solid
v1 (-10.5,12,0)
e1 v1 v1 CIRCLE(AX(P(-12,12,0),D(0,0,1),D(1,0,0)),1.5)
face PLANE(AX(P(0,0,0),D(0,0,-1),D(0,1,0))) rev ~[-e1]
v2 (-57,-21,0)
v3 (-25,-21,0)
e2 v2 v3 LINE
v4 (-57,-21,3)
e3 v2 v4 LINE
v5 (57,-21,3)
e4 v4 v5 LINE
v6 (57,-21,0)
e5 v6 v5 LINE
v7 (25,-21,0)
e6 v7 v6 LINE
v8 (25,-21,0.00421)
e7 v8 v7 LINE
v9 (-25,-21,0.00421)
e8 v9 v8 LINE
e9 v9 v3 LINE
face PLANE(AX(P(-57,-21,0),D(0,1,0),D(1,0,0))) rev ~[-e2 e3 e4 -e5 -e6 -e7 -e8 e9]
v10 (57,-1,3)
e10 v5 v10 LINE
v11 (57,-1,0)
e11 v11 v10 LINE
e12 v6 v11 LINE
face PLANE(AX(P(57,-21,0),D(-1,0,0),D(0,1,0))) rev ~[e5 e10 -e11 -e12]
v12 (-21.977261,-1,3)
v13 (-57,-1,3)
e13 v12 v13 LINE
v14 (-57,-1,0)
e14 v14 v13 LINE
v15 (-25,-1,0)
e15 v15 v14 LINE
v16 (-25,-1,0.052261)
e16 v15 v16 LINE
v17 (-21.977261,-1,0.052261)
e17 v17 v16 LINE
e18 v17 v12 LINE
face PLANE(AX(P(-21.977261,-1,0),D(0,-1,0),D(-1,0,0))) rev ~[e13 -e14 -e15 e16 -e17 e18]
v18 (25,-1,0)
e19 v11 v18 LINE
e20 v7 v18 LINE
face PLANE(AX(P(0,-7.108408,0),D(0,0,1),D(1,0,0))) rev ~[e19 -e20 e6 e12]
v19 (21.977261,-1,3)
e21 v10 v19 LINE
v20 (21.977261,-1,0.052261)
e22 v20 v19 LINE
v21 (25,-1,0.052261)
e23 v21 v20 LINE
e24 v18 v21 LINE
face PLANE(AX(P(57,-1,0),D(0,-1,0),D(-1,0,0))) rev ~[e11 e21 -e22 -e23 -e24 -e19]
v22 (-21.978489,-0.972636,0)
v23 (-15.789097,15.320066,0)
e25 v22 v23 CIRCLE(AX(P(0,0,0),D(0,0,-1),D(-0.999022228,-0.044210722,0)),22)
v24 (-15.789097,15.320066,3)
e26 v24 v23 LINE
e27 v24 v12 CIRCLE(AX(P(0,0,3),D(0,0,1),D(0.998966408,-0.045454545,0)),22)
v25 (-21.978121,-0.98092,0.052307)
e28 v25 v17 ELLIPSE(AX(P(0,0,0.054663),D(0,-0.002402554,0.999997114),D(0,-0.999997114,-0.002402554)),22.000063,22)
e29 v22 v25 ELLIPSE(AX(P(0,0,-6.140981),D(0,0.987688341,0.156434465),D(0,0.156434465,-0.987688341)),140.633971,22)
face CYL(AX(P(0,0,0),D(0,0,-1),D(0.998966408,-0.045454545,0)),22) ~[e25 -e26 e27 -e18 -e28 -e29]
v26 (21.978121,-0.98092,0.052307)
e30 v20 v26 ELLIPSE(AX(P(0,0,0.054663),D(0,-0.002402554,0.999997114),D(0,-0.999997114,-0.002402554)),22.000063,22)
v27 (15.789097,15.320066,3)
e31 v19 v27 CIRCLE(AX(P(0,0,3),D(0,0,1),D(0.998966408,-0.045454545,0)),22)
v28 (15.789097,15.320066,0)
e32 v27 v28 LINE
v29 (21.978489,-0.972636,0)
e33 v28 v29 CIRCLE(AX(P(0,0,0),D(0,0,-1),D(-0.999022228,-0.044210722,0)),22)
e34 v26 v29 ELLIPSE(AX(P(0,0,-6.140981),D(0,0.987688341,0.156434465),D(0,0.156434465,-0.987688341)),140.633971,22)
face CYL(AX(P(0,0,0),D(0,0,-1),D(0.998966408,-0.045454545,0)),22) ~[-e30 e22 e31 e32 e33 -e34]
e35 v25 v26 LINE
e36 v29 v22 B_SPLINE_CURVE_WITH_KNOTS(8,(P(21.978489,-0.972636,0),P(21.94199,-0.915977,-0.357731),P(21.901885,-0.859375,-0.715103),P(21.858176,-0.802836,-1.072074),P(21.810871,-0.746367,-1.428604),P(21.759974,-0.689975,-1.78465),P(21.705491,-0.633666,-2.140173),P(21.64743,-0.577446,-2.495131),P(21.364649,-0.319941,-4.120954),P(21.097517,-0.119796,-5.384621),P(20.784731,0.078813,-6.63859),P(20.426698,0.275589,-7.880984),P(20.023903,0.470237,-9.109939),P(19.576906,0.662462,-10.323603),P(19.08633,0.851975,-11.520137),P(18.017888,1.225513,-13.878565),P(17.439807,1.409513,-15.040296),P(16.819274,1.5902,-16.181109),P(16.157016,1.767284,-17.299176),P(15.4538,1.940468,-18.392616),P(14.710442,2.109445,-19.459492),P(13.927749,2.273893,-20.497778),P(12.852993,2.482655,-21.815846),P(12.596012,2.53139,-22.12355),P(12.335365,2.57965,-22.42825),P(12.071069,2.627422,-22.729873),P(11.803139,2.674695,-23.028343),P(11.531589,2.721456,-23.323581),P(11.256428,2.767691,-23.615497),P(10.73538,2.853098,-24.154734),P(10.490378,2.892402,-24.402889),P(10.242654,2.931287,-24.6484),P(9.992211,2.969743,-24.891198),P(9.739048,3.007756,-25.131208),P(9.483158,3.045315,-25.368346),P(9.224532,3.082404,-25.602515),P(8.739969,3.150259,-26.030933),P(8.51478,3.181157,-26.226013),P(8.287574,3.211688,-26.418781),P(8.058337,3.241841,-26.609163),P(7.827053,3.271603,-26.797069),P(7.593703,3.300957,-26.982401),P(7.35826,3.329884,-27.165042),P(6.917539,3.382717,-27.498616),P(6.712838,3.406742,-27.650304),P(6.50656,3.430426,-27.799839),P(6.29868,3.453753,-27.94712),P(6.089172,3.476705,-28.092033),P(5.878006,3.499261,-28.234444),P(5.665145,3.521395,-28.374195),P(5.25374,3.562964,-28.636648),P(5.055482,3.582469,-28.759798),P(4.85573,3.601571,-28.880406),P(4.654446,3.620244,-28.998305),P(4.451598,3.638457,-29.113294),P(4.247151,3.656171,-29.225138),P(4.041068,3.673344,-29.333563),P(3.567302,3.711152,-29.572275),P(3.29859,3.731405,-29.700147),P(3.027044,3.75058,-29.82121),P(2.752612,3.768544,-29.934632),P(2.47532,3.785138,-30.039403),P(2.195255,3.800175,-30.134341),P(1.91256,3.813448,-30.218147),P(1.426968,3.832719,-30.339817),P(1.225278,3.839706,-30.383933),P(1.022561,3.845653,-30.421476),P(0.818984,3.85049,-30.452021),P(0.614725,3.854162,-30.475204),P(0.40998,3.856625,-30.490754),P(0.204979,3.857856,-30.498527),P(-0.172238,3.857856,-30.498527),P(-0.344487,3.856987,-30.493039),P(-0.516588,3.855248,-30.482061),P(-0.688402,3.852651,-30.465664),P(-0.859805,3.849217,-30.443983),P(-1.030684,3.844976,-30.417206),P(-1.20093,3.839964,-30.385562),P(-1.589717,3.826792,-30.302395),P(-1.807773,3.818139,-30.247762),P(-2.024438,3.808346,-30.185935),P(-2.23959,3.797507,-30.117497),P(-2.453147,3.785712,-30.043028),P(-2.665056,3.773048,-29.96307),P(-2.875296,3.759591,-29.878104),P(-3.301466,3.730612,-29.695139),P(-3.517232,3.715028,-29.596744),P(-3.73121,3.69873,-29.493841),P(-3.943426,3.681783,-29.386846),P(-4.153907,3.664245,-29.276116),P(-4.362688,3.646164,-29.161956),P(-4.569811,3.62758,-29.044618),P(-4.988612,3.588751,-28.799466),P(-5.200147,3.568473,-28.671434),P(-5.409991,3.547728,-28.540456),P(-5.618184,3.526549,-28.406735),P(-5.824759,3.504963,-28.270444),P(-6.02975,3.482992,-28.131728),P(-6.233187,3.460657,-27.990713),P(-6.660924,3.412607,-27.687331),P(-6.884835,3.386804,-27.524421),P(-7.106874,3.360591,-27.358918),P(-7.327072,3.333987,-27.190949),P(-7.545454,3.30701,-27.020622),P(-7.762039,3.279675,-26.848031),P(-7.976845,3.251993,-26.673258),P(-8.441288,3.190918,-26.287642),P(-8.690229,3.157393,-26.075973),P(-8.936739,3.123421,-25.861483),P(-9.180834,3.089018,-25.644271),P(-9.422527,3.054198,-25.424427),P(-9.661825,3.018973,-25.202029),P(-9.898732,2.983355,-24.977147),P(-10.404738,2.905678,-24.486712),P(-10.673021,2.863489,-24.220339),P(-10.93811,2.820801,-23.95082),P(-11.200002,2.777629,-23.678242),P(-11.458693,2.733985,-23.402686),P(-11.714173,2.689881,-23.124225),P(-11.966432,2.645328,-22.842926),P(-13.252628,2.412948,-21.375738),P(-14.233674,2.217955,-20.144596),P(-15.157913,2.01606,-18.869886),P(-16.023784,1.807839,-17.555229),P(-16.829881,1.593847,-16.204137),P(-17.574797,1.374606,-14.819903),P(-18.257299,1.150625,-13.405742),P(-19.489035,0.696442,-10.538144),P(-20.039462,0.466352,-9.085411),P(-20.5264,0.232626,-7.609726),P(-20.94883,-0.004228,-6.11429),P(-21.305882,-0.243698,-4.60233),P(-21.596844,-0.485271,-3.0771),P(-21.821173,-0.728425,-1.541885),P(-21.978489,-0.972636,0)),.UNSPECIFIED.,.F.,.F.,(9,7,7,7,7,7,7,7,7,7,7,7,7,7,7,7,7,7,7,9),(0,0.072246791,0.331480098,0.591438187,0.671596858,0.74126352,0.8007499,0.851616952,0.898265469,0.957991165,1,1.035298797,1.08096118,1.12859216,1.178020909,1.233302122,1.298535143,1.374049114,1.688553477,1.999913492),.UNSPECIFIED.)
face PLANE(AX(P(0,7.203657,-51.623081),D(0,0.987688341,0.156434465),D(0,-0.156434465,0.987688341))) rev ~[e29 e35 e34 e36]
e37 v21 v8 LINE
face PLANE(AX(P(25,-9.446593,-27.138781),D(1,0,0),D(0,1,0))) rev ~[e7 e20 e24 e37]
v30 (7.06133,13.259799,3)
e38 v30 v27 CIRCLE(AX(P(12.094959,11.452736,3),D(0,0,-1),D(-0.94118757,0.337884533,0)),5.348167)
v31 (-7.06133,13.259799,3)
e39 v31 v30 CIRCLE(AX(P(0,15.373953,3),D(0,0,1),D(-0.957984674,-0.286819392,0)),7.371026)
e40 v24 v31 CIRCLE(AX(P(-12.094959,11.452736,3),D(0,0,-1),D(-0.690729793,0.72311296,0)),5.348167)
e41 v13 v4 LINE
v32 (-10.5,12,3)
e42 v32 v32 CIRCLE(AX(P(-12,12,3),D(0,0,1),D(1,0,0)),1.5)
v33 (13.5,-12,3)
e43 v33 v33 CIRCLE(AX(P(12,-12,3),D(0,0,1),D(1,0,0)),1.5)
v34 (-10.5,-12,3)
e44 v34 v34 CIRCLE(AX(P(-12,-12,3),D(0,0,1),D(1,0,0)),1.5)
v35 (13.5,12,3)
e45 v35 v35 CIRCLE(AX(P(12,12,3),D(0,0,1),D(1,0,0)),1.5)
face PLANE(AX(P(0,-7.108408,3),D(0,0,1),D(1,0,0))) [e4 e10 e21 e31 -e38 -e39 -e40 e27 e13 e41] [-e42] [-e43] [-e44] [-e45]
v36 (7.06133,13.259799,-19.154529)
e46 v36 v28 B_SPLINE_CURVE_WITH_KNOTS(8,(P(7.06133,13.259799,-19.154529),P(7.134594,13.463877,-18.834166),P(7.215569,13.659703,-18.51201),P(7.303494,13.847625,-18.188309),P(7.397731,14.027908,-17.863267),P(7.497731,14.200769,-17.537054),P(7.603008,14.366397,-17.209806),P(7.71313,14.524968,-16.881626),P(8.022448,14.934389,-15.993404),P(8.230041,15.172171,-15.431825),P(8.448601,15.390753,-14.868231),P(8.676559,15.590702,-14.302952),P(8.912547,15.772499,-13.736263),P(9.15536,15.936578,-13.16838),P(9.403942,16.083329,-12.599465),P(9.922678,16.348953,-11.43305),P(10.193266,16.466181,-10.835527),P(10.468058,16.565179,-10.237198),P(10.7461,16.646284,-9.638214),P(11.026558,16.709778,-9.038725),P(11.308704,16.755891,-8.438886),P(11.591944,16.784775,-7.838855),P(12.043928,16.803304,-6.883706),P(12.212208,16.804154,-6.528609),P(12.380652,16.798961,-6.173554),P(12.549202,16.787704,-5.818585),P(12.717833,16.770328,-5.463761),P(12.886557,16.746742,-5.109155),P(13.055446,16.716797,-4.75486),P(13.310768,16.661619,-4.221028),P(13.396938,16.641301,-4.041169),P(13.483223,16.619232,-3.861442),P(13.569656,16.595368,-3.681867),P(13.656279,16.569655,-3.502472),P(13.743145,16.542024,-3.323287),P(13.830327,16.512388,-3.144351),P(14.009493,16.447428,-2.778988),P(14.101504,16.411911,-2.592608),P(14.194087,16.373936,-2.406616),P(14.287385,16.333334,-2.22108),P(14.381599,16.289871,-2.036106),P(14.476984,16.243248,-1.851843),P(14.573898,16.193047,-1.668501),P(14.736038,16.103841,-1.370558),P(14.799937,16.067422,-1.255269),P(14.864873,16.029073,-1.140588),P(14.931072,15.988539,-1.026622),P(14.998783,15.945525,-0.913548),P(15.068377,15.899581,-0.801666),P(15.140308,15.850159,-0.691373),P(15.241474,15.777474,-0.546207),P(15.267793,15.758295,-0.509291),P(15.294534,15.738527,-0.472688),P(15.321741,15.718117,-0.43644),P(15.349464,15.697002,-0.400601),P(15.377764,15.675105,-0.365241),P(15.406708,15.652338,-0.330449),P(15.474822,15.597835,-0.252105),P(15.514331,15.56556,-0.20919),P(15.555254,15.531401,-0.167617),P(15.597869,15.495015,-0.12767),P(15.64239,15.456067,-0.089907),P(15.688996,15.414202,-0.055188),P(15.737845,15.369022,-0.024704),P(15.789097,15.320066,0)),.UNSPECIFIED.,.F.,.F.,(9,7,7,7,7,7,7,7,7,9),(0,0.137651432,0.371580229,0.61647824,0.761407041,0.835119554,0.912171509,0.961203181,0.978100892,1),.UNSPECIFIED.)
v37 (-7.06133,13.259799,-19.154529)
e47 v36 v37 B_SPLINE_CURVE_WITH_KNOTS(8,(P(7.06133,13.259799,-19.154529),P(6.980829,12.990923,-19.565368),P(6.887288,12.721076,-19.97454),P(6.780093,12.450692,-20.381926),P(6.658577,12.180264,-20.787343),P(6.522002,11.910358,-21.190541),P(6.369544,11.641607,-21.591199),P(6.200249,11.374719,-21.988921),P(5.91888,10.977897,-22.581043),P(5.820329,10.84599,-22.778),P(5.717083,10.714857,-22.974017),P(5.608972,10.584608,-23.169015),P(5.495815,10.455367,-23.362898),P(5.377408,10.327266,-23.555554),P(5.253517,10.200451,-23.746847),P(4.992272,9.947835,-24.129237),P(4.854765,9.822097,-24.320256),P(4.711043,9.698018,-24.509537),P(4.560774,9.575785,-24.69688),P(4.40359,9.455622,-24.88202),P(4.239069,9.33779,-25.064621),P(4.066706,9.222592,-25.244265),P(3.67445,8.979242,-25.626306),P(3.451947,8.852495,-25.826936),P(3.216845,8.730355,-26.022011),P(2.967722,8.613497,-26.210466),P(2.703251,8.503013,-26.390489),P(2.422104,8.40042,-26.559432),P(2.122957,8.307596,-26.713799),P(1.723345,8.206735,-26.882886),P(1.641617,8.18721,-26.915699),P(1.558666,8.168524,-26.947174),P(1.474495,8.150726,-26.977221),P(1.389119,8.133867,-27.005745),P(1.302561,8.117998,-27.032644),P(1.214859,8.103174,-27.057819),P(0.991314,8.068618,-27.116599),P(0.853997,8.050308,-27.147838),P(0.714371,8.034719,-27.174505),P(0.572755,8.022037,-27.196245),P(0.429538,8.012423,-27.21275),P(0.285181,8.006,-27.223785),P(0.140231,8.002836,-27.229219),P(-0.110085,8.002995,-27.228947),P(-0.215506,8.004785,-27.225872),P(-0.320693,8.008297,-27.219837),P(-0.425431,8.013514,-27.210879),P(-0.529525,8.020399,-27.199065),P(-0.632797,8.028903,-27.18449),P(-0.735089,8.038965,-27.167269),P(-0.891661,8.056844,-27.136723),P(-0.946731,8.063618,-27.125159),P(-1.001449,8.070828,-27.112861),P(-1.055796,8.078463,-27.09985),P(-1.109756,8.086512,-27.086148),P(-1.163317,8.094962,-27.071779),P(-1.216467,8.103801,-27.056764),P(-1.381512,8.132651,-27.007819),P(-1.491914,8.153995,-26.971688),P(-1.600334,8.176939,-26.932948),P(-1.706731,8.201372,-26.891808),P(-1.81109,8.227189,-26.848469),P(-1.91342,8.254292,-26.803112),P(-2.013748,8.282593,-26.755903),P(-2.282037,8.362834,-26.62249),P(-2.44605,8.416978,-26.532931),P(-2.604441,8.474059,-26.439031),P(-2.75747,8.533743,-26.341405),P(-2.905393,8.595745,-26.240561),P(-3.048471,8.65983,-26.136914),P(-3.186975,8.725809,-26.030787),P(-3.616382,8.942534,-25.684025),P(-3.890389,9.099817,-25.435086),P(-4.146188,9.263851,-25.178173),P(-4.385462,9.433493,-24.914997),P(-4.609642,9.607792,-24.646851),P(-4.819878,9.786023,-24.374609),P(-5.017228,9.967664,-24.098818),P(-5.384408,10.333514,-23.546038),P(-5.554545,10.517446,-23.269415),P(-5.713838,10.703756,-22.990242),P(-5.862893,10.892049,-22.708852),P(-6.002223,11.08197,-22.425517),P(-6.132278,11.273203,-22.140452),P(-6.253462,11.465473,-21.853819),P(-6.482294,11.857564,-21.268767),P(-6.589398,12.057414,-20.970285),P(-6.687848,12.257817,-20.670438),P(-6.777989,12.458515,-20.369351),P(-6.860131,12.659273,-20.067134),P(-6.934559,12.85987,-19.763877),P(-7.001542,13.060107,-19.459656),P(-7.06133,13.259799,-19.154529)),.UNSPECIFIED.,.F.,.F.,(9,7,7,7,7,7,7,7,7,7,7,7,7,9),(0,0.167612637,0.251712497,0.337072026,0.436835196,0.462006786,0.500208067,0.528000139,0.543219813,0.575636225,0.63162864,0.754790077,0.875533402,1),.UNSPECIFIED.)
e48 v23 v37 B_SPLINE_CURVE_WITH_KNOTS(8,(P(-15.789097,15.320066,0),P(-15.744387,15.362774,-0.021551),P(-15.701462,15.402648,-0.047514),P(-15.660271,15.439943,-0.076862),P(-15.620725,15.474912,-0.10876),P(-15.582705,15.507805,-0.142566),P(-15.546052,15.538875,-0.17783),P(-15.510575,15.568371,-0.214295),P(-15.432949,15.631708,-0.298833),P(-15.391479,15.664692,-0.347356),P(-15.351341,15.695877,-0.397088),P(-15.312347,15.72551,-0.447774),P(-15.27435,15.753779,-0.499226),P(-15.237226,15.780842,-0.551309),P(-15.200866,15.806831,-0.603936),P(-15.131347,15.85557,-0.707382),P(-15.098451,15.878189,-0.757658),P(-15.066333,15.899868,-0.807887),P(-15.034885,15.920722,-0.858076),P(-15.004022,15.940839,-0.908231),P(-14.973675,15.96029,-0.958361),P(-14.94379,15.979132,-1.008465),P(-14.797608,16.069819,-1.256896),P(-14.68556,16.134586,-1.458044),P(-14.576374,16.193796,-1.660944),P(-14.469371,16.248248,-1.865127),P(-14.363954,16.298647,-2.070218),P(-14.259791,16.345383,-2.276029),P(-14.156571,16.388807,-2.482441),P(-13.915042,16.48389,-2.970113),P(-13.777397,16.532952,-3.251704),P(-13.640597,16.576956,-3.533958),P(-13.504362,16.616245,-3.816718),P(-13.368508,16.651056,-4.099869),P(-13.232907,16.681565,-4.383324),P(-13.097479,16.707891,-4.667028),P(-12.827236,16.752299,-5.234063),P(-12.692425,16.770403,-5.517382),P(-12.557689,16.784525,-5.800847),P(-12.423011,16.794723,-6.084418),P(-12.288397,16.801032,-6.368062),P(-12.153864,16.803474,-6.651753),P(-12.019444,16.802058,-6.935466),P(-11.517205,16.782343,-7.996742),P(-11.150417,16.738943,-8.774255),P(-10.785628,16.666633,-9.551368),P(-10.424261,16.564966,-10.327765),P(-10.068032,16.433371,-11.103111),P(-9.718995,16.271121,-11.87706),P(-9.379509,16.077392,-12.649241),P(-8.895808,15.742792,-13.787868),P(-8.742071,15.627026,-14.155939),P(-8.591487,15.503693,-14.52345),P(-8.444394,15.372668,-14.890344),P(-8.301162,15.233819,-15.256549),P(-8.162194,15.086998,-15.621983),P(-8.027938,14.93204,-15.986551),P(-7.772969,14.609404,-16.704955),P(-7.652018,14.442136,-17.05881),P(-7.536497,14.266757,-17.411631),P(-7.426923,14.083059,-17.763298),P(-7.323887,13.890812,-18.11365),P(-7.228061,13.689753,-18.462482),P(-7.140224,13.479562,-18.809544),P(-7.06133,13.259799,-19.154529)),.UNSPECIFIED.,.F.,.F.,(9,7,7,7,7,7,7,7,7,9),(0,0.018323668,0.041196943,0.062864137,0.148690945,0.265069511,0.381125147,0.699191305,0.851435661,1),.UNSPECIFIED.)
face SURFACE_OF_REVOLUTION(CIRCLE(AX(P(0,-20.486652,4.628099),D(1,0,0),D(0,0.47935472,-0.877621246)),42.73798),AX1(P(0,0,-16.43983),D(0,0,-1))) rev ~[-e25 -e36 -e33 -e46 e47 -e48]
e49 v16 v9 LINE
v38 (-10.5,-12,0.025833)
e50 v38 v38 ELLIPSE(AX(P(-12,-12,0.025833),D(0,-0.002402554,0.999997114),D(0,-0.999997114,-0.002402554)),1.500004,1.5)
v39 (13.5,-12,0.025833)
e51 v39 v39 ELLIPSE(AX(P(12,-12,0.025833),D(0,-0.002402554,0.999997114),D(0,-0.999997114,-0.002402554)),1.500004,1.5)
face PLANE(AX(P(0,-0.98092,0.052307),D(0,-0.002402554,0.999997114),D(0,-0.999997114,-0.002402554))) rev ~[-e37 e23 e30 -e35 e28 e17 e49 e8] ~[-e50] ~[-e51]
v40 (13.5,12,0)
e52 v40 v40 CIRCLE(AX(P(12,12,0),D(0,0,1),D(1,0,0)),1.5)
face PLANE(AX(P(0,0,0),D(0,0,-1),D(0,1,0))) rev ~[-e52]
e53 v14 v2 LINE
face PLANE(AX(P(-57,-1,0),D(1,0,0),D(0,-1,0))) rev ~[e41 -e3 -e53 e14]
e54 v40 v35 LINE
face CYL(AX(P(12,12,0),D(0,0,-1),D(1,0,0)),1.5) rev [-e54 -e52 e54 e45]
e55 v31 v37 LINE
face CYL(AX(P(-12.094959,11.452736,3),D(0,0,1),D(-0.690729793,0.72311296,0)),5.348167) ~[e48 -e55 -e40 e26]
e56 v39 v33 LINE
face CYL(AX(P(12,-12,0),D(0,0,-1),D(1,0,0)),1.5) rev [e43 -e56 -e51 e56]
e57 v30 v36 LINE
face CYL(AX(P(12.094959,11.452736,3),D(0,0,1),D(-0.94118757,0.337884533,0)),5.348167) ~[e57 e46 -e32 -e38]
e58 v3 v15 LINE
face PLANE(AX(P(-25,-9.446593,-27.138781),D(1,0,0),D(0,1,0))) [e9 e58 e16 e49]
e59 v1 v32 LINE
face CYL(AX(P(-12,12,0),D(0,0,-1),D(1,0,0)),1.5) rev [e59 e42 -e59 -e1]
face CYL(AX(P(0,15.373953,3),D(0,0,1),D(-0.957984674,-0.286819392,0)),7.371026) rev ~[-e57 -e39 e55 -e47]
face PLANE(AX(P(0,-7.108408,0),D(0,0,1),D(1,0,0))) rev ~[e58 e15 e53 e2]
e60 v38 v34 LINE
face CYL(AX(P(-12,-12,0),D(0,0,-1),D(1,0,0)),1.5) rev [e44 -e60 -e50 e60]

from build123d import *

# Parameters (mm, degrees)
F0_R     = 1.5
F1_DEPTH = 3
F5_DEPTH = 25
F7_DEPTH = 35


# Not quite as in the source:
# - a feature names something its author has since deleted; it is built from what else it names


with BuildPart() as f1:
    # F0 (on Top) → F1 (new body)
    with BuildSketch(Plane.XY):
        with BuildLine():
            Line((6.5574385243, -21), (57, -21))
            Line((57, -21), (57, -1))
            Line((57, -1), (21.9772609758, -1))
            ThreePointArc((21.9772609758, -1), (0, 22), (-21.9772609758, -1))
            Line((-21.9772609758, -1), (-57, -1))
            Line((-57, -1), (-57, -21))
            Line((-57, -21), (6.5574385243, -21))
        make_face()
        with Locations((-12, -12)):
            Circle(F0_R, mode=Mode.SUBTRACT)
        with Locations((12, -12)):
            Circle(F0_R, mode=Mode.SUBTRACT)
        with Locations((-12, 12)):
            Circle(F0_R, mode=Mode.SUBTRACT)
        with Locations((12, 12)):
            Circle(F0_R, mode=Mode.SUBTRACT)
    extrude(amount=F1_DEPTH)

    # F2 (on Right) → F3 (revolve)
    with BuildSketch(Plane.YZ):
        with BuildLine():
            Line((0, 0), (0, -32.8796606992))
            ThreePointArc((0, -32.8796606992), (15.0334447446, -19.1386350968), (22, 0))
            Line((22, 0), (0, 0))
        make_face()
    revolve(axis=Axis((0, 0, -16.4398303496), (0, 0, -1)))

    # F4 (on Right) → F5 (cut, symmetric)
    with BuildSketch(Plane.YZ):
        Polygon((7.20365692, -51.6230810942), (-0.9809204616, 0.0523067461), (-22.7521642769, 0), (-21.7191129923, -52.1955192089), align=None)
    extrude(amount=F5_DEPTH, both=True, mode=Mode.SUBTRACT)

    # F6 (on face) → F7 (cut)
    with BuildSketch(Plane.XY.offset(3)):
        with BuildLine():
            ThreePointArc((-15.7890972634, 15.3200655223), (-10.8662470151, 16.6578455627), (-7.0613301317, 13.2597994308))
            ThreePointArc((-7.0613301317, 13.2597994308), (0, 8.0029264883), (7.0613301317, 13.2597994308))
            ThreePointArc((7.0613301317, 13.2597994308), (10.8662470151, 16.6578455627), (15.7890972634, 15.3200655223))
            ThreePointArc((15.7890972634, 15.3200655223), (0, 22), (-15.7890972634, 15.3200655223))
        make_face()
    extrude(amount=-F7_DEPTH, mode=Mode.SUBTRACT)


solid = f1.part
